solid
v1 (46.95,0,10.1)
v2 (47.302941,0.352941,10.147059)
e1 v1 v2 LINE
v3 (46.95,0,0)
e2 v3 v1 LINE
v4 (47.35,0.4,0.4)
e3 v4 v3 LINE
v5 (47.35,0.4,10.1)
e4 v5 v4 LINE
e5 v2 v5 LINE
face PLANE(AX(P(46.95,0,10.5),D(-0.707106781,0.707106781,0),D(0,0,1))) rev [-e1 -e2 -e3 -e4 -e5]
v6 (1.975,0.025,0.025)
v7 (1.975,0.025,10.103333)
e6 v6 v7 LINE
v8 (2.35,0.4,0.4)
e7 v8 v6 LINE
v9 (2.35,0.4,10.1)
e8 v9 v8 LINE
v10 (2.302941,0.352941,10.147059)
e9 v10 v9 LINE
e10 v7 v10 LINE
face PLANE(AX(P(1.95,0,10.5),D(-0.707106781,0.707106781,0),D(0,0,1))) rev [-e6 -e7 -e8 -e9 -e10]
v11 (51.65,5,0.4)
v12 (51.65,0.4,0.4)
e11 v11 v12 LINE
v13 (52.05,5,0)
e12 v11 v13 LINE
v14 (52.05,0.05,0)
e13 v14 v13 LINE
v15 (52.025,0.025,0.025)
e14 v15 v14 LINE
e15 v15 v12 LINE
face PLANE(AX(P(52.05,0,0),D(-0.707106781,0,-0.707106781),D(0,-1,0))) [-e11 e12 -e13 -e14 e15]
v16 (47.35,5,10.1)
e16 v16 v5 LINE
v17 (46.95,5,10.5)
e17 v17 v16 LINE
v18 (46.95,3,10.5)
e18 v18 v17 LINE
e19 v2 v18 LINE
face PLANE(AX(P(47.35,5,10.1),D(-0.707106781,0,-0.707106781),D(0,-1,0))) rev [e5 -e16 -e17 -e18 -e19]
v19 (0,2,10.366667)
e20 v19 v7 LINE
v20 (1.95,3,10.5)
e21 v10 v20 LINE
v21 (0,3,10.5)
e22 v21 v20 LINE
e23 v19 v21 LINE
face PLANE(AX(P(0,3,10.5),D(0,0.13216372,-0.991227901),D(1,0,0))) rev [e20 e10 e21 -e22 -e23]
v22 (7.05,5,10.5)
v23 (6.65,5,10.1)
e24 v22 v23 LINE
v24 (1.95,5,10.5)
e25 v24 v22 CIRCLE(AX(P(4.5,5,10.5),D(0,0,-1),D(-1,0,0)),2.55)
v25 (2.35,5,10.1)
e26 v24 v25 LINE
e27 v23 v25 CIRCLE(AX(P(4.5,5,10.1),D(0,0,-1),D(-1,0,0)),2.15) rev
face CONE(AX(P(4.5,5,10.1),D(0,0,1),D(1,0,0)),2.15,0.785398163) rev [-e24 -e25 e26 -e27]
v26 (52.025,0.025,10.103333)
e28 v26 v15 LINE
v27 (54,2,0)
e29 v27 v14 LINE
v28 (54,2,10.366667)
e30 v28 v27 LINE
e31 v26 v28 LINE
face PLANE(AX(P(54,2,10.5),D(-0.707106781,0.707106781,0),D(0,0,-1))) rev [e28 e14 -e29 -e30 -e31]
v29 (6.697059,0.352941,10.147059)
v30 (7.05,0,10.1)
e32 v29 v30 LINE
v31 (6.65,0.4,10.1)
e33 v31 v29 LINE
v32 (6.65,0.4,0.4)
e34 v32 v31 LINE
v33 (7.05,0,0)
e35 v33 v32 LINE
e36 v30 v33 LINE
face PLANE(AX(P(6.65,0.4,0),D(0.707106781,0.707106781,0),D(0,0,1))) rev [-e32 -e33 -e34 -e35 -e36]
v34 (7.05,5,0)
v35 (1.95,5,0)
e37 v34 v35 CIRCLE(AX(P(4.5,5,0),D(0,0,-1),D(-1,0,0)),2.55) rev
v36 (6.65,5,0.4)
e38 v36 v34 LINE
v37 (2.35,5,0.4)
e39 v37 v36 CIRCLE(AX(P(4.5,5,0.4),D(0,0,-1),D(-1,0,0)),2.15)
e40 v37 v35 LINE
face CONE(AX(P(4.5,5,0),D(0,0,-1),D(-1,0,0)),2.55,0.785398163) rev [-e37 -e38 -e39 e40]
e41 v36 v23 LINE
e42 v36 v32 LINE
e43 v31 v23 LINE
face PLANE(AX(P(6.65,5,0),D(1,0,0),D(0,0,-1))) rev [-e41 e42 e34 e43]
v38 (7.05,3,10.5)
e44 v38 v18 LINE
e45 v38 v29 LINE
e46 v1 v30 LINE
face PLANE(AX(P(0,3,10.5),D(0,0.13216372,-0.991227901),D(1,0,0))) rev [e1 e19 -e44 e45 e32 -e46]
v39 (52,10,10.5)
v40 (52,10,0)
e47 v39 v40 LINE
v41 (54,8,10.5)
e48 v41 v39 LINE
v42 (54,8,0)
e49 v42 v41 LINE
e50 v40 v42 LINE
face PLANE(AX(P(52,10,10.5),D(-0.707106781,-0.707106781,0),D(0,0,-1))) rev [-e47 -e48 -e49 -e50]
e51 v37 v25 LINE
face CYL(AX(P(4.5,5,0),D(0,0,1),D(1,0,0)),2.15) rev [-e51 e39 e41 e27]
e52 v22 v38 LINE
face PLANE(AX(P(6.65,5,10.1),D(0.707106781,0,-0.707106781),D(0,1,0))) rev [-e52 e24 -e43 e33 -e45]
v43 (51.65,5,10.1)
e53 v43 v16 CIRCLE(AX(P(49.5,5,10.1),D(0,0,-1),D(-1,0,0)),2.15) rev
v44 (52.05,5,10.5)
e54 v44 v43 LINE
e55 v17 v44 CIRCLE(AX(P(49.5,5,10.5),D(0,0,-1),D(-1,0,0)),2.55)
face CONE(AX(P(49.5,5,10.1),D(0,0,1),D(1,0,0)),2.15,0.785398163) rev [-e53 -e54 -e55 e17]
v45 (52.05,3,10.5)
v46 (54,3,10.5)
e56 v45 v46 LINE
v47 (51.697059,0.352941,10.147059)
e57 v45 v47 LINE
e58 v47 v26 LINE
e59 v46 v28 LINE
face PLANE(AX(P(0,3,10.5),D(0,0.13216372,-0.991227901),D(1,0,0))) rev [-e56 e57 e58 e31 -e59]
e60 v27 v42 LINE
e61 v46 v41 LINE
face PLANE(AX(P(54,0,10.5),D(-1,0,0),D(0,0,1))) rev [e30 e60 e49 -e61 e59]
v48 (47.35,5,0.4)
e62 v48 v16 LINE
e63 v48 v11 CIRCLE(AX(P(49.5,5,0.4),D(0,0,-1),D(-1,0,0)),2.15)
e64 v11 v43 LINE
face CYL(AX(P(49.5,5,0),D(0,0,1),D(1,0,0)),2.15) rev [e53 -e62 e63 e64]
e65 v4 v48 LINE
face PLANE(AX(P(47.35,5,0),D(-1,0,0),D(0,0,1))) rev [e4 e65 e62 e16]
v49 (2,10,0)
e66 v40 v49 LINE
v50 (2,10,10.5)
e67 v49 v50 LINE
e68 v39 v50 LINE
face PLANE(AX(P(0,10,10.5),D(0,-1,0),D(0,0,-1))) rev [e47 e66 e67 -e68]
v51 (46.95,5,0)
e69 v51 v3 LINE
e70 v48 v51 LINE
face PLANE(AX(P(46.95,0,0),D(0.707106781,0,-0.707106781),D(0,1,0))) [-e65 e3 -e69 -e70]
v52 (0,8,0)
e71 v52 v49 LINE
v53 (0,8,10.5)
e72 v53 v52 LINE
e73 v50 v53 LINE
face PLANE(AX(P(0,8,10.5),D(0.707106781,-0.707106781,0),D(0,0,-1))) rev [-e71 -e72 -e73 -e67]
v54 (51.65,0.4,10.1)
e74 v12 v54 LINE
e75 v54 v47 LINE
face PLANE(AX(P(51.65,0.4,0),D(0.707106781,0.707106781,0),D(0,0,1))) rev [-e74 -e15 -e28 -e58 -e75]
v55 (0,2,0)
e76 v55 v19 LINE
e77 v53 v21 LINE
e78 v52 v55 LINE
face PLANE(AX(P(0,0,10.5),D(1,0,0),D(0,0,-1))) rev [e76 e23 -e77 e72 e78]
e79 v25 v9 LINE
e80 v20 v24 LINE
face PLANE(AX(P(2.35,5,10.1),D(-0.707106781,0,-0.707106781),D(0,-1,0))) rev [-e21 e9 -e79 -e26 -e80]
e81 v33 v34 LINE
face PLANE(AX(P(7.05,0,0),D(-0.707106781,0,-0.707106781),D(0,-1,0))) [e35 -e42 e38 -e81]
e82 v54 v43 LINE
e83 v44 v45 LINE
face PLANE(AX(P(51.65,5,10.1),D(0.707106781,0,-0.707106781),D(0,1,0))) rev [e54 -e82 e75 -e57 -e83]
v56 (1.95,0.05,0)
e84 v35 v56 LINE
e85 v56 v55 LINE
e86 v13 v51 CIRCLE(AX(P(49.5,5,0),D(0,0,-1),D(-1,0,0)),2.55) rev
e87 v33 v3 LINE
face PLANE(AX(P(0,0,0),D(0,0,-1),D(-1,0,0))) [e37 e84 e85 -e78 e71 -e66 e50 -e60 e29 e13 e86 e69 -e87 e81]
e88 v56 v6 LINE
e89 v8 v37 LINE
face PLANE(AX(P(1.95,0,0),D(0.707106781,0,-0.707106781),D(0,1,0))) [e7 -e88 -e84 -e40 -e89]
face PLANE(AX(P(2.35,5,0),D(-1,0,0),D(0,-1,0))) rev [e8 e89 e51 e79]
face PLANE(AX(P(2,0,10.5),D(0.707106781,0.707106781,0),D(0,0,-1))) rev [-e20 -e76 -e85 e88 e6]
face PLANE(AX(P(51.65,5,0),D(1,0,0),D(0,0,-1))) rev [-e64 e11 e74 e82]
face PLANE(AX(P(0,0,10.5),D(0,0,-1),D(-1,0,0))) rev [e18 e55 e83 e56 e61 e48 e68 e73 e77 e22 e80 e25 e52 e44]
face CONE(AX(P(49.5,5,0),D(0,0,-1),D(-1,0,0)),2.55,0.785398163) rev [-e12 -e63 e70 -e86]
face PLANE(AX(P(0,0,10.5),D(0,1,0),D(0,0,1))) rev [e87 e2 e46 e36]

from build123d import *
from OCP.BRepFilletAPI import BRepFilletAPI_MakeChamfer

# Parameters (mm, degrees)
SKETCH1_W           = 54
SKETCH1_H           = 10
BOSS_EXTRUDE1_DEPTH = 10.5
SKETCH2_R           = 2.15
CUT_EXTRUDE1_DEPTH  = 10.5
SKETCH3_W           = 4.3
SKETCH3_H           = 5
CUT_EXTRUDE2_DEPTH  = 10.5
CHAMFER3_SIZE       = 0.4
CHAMFER3_SIZE2      = 3
CHAMFER1_SIZE       = 2
CHAMFER2_SIZE       = 0.4
CHAMFER4_SIZE       = 0.4


with BuildPart() as part:
    # Sketch1 → Boss-Extrude1 (new body)
    with BuildSketch(Plane.XY):
        with Locations((27, 5)):
            Rectangle(SKETCH1_W, SKETCH1_H)
    extrude(amount=BOSS_EXTRUDE1_DEPTH)

    # Sketch2 → Cut-Extrude1 (cut)
    with BuildSketch(Plane.XY.offset(10.5)):
        with Locations((4.5, 5)):
            Circle(SKETCH2_R)
        with Locations((49.5, 5)):
            Circle(SKETCH2_R)
    extrude(amount=-CUT_EXTRUDE1_DEPTH, mode=Mode.SUBTRACT)

    # Sketch3 → Cut-Extrude2 (cut)
    with BuildSketch(Plane.XY.offset(10.5)):
        with Locations((4.5, 2.5)):
            Rectangle(SKETCH3_W, SKETCH3_H)
        with Locations((49.5, 2.5)):
            Rectangle(SKETCH3_W, SKETCH3_H)
    extrude(amount=-CUT_EXTRUDE2_DEPTH, mode=Mode.SUBTRACT)

    # Chamfer3: one chamfer whose edges measure the first distance from different faces: ONE call of the kernel's chamfer builder (chamfer() names one face for all edges)
    chamfer3_edges_1 = [part.edges().sort_by_distance(p)[0] for p in [
        (27, 0, 10.5),
    ]]
    chamfer3_side_1 = [part.faces().sort_by_distance(p)[0] for p in [
        (27, 0, 5.25),
    ]]
    chamfer3_edges_2 = [part.edges().sort_by_distance(p)[0] for p in [
        (52.825, 0, 10.5),
    ]]
    chamfer3_side_2 = [part.faces().sort_by_distance(p)[0] for p in [
        (52.825, 0, 5.25),
    ]]
    chamfer3_edges_3 = [part.edges().sort_by_distance(p)[0] for p in [
        (1.175, 0, 10.5),
    ]]
    chamfer3_side_3 = [part.faces().sort_by_distance(p)[0] for p in [
        (1.175, 0, 5.25),
    ]]
    chamfer3 = BRepFilletAPI_MakeChamfer(part.part.solid().wrapped)
    for e in chamfer3_edges_1:
        chamfer3.Add(CHAMFER3_SIZE, CHAMFER3_SIZE2, e.wrapped, chamfer3_side_1[0].wrapped)  # the first distance lies on this face
    for e in chamfer3_edges_2:
        chamfer3.Add(CHAMFER3_SIZE, CHAMFER3_SIZE2, e.wrapped, chamfer3_side_2[0].wrapped)  # the first distance lies on this face
    for e in chamfer3_edges_3:
        chamfer3.Add(CHAMFER3_SIZE, CHAMFER3_SIZE2, e.wrapped, chamfer3_side_3[0].wrapped)  # the first distance lies on this face
    add(Compound.cast(chamfer3.Shape()), mode=Mode.REPLACE)

    # Chamfer1
    chamfer1_edges = [part.edges().sort_by_distance(p)[0] for p in [
        (0, 0, 5.05),
        (54, 0, 5.05),
        (0, 10, 5.25),
        (54, 10, 5.25),
    ]]
    chamfer(chamfer1_edges, length=CHAMFER1_SIZE)

    # Chamfer2
    chamfer2_edges = [part.edges().sort_by_distance(p)[0] for p in [
        (49.5, 7.15, 10.5),
        (49.5, 7.15, 0),
        (4.5, 7.15, 10.5),
        (4.5, 7.15, 0),
        (51.65, 2.5, 0),
        (47.35, 2.5, 0),
        (51.65, 4, 10.5),
        (47.35, 4, 10.5),
        (6.65, 2.5, 0),
        (2.35, 2.5, 0),
        (6.65, 4, 10.5),
        (2.35, 4, 10.5),
    ]]
    chamfer(chamfer2_edges, length=CHAMFER2_SIZE)

    # Chamfer4
    # the kernel refuses this chamfer: 0.4 mm, written as the material it takes off along each edge
    with BuildSketch(Plane(origin=(47.35, 0, 11.128673195), x_dir=(-0.9996219169112968, -0.02749587661058673, 0), z_dir=(0, 0, -1)), Plane(origin=(2.35, 0, 11.128673195), x_dir=(-0.9996219169112968, -0.027495876610586386, 0), z_dir=(0, 0, -1))) as chamfer4_piece_1:
        Polygon((CHAMFER4_SIZE * 0.999621916911, CHAMFER4_SIZE * 0.0274958766106), (-CHAMFER4_SIZE * 0.0274958766106, CHAMFER4_SIZE * 0.999621916911), (0, 0), align=None)
    extrude(amount=11.75734639, mode=Mode.SUBTRACT)
    with BuildSketch(Plane(origin=(6.65, 0, 11.128673195), x_dir=(0.9996219169112968, -0.027495876610586324, 0), z_dir=(0, 0, -1)), Plane(origin=(51.65, 0, 11.128673195), x_dir=(0.9996219169112968, -0.02749587661058674, 0), z_dir=(0, 0, -1))) as chamfer4_piece_2:
        Polygon((CHAMFER4_SIZE * 0.999621916911, -CHAMFER4_SIZE * 0.0274958766106), (-CHAMFER4_SIZE * 0.0274958766106, -CHAMFER4_SIZE * 0.999621916911), (0, 0), align=None)
    extrude(amount=11.75734639, mode=Mode.SUBTRACT)


solid = part.part
